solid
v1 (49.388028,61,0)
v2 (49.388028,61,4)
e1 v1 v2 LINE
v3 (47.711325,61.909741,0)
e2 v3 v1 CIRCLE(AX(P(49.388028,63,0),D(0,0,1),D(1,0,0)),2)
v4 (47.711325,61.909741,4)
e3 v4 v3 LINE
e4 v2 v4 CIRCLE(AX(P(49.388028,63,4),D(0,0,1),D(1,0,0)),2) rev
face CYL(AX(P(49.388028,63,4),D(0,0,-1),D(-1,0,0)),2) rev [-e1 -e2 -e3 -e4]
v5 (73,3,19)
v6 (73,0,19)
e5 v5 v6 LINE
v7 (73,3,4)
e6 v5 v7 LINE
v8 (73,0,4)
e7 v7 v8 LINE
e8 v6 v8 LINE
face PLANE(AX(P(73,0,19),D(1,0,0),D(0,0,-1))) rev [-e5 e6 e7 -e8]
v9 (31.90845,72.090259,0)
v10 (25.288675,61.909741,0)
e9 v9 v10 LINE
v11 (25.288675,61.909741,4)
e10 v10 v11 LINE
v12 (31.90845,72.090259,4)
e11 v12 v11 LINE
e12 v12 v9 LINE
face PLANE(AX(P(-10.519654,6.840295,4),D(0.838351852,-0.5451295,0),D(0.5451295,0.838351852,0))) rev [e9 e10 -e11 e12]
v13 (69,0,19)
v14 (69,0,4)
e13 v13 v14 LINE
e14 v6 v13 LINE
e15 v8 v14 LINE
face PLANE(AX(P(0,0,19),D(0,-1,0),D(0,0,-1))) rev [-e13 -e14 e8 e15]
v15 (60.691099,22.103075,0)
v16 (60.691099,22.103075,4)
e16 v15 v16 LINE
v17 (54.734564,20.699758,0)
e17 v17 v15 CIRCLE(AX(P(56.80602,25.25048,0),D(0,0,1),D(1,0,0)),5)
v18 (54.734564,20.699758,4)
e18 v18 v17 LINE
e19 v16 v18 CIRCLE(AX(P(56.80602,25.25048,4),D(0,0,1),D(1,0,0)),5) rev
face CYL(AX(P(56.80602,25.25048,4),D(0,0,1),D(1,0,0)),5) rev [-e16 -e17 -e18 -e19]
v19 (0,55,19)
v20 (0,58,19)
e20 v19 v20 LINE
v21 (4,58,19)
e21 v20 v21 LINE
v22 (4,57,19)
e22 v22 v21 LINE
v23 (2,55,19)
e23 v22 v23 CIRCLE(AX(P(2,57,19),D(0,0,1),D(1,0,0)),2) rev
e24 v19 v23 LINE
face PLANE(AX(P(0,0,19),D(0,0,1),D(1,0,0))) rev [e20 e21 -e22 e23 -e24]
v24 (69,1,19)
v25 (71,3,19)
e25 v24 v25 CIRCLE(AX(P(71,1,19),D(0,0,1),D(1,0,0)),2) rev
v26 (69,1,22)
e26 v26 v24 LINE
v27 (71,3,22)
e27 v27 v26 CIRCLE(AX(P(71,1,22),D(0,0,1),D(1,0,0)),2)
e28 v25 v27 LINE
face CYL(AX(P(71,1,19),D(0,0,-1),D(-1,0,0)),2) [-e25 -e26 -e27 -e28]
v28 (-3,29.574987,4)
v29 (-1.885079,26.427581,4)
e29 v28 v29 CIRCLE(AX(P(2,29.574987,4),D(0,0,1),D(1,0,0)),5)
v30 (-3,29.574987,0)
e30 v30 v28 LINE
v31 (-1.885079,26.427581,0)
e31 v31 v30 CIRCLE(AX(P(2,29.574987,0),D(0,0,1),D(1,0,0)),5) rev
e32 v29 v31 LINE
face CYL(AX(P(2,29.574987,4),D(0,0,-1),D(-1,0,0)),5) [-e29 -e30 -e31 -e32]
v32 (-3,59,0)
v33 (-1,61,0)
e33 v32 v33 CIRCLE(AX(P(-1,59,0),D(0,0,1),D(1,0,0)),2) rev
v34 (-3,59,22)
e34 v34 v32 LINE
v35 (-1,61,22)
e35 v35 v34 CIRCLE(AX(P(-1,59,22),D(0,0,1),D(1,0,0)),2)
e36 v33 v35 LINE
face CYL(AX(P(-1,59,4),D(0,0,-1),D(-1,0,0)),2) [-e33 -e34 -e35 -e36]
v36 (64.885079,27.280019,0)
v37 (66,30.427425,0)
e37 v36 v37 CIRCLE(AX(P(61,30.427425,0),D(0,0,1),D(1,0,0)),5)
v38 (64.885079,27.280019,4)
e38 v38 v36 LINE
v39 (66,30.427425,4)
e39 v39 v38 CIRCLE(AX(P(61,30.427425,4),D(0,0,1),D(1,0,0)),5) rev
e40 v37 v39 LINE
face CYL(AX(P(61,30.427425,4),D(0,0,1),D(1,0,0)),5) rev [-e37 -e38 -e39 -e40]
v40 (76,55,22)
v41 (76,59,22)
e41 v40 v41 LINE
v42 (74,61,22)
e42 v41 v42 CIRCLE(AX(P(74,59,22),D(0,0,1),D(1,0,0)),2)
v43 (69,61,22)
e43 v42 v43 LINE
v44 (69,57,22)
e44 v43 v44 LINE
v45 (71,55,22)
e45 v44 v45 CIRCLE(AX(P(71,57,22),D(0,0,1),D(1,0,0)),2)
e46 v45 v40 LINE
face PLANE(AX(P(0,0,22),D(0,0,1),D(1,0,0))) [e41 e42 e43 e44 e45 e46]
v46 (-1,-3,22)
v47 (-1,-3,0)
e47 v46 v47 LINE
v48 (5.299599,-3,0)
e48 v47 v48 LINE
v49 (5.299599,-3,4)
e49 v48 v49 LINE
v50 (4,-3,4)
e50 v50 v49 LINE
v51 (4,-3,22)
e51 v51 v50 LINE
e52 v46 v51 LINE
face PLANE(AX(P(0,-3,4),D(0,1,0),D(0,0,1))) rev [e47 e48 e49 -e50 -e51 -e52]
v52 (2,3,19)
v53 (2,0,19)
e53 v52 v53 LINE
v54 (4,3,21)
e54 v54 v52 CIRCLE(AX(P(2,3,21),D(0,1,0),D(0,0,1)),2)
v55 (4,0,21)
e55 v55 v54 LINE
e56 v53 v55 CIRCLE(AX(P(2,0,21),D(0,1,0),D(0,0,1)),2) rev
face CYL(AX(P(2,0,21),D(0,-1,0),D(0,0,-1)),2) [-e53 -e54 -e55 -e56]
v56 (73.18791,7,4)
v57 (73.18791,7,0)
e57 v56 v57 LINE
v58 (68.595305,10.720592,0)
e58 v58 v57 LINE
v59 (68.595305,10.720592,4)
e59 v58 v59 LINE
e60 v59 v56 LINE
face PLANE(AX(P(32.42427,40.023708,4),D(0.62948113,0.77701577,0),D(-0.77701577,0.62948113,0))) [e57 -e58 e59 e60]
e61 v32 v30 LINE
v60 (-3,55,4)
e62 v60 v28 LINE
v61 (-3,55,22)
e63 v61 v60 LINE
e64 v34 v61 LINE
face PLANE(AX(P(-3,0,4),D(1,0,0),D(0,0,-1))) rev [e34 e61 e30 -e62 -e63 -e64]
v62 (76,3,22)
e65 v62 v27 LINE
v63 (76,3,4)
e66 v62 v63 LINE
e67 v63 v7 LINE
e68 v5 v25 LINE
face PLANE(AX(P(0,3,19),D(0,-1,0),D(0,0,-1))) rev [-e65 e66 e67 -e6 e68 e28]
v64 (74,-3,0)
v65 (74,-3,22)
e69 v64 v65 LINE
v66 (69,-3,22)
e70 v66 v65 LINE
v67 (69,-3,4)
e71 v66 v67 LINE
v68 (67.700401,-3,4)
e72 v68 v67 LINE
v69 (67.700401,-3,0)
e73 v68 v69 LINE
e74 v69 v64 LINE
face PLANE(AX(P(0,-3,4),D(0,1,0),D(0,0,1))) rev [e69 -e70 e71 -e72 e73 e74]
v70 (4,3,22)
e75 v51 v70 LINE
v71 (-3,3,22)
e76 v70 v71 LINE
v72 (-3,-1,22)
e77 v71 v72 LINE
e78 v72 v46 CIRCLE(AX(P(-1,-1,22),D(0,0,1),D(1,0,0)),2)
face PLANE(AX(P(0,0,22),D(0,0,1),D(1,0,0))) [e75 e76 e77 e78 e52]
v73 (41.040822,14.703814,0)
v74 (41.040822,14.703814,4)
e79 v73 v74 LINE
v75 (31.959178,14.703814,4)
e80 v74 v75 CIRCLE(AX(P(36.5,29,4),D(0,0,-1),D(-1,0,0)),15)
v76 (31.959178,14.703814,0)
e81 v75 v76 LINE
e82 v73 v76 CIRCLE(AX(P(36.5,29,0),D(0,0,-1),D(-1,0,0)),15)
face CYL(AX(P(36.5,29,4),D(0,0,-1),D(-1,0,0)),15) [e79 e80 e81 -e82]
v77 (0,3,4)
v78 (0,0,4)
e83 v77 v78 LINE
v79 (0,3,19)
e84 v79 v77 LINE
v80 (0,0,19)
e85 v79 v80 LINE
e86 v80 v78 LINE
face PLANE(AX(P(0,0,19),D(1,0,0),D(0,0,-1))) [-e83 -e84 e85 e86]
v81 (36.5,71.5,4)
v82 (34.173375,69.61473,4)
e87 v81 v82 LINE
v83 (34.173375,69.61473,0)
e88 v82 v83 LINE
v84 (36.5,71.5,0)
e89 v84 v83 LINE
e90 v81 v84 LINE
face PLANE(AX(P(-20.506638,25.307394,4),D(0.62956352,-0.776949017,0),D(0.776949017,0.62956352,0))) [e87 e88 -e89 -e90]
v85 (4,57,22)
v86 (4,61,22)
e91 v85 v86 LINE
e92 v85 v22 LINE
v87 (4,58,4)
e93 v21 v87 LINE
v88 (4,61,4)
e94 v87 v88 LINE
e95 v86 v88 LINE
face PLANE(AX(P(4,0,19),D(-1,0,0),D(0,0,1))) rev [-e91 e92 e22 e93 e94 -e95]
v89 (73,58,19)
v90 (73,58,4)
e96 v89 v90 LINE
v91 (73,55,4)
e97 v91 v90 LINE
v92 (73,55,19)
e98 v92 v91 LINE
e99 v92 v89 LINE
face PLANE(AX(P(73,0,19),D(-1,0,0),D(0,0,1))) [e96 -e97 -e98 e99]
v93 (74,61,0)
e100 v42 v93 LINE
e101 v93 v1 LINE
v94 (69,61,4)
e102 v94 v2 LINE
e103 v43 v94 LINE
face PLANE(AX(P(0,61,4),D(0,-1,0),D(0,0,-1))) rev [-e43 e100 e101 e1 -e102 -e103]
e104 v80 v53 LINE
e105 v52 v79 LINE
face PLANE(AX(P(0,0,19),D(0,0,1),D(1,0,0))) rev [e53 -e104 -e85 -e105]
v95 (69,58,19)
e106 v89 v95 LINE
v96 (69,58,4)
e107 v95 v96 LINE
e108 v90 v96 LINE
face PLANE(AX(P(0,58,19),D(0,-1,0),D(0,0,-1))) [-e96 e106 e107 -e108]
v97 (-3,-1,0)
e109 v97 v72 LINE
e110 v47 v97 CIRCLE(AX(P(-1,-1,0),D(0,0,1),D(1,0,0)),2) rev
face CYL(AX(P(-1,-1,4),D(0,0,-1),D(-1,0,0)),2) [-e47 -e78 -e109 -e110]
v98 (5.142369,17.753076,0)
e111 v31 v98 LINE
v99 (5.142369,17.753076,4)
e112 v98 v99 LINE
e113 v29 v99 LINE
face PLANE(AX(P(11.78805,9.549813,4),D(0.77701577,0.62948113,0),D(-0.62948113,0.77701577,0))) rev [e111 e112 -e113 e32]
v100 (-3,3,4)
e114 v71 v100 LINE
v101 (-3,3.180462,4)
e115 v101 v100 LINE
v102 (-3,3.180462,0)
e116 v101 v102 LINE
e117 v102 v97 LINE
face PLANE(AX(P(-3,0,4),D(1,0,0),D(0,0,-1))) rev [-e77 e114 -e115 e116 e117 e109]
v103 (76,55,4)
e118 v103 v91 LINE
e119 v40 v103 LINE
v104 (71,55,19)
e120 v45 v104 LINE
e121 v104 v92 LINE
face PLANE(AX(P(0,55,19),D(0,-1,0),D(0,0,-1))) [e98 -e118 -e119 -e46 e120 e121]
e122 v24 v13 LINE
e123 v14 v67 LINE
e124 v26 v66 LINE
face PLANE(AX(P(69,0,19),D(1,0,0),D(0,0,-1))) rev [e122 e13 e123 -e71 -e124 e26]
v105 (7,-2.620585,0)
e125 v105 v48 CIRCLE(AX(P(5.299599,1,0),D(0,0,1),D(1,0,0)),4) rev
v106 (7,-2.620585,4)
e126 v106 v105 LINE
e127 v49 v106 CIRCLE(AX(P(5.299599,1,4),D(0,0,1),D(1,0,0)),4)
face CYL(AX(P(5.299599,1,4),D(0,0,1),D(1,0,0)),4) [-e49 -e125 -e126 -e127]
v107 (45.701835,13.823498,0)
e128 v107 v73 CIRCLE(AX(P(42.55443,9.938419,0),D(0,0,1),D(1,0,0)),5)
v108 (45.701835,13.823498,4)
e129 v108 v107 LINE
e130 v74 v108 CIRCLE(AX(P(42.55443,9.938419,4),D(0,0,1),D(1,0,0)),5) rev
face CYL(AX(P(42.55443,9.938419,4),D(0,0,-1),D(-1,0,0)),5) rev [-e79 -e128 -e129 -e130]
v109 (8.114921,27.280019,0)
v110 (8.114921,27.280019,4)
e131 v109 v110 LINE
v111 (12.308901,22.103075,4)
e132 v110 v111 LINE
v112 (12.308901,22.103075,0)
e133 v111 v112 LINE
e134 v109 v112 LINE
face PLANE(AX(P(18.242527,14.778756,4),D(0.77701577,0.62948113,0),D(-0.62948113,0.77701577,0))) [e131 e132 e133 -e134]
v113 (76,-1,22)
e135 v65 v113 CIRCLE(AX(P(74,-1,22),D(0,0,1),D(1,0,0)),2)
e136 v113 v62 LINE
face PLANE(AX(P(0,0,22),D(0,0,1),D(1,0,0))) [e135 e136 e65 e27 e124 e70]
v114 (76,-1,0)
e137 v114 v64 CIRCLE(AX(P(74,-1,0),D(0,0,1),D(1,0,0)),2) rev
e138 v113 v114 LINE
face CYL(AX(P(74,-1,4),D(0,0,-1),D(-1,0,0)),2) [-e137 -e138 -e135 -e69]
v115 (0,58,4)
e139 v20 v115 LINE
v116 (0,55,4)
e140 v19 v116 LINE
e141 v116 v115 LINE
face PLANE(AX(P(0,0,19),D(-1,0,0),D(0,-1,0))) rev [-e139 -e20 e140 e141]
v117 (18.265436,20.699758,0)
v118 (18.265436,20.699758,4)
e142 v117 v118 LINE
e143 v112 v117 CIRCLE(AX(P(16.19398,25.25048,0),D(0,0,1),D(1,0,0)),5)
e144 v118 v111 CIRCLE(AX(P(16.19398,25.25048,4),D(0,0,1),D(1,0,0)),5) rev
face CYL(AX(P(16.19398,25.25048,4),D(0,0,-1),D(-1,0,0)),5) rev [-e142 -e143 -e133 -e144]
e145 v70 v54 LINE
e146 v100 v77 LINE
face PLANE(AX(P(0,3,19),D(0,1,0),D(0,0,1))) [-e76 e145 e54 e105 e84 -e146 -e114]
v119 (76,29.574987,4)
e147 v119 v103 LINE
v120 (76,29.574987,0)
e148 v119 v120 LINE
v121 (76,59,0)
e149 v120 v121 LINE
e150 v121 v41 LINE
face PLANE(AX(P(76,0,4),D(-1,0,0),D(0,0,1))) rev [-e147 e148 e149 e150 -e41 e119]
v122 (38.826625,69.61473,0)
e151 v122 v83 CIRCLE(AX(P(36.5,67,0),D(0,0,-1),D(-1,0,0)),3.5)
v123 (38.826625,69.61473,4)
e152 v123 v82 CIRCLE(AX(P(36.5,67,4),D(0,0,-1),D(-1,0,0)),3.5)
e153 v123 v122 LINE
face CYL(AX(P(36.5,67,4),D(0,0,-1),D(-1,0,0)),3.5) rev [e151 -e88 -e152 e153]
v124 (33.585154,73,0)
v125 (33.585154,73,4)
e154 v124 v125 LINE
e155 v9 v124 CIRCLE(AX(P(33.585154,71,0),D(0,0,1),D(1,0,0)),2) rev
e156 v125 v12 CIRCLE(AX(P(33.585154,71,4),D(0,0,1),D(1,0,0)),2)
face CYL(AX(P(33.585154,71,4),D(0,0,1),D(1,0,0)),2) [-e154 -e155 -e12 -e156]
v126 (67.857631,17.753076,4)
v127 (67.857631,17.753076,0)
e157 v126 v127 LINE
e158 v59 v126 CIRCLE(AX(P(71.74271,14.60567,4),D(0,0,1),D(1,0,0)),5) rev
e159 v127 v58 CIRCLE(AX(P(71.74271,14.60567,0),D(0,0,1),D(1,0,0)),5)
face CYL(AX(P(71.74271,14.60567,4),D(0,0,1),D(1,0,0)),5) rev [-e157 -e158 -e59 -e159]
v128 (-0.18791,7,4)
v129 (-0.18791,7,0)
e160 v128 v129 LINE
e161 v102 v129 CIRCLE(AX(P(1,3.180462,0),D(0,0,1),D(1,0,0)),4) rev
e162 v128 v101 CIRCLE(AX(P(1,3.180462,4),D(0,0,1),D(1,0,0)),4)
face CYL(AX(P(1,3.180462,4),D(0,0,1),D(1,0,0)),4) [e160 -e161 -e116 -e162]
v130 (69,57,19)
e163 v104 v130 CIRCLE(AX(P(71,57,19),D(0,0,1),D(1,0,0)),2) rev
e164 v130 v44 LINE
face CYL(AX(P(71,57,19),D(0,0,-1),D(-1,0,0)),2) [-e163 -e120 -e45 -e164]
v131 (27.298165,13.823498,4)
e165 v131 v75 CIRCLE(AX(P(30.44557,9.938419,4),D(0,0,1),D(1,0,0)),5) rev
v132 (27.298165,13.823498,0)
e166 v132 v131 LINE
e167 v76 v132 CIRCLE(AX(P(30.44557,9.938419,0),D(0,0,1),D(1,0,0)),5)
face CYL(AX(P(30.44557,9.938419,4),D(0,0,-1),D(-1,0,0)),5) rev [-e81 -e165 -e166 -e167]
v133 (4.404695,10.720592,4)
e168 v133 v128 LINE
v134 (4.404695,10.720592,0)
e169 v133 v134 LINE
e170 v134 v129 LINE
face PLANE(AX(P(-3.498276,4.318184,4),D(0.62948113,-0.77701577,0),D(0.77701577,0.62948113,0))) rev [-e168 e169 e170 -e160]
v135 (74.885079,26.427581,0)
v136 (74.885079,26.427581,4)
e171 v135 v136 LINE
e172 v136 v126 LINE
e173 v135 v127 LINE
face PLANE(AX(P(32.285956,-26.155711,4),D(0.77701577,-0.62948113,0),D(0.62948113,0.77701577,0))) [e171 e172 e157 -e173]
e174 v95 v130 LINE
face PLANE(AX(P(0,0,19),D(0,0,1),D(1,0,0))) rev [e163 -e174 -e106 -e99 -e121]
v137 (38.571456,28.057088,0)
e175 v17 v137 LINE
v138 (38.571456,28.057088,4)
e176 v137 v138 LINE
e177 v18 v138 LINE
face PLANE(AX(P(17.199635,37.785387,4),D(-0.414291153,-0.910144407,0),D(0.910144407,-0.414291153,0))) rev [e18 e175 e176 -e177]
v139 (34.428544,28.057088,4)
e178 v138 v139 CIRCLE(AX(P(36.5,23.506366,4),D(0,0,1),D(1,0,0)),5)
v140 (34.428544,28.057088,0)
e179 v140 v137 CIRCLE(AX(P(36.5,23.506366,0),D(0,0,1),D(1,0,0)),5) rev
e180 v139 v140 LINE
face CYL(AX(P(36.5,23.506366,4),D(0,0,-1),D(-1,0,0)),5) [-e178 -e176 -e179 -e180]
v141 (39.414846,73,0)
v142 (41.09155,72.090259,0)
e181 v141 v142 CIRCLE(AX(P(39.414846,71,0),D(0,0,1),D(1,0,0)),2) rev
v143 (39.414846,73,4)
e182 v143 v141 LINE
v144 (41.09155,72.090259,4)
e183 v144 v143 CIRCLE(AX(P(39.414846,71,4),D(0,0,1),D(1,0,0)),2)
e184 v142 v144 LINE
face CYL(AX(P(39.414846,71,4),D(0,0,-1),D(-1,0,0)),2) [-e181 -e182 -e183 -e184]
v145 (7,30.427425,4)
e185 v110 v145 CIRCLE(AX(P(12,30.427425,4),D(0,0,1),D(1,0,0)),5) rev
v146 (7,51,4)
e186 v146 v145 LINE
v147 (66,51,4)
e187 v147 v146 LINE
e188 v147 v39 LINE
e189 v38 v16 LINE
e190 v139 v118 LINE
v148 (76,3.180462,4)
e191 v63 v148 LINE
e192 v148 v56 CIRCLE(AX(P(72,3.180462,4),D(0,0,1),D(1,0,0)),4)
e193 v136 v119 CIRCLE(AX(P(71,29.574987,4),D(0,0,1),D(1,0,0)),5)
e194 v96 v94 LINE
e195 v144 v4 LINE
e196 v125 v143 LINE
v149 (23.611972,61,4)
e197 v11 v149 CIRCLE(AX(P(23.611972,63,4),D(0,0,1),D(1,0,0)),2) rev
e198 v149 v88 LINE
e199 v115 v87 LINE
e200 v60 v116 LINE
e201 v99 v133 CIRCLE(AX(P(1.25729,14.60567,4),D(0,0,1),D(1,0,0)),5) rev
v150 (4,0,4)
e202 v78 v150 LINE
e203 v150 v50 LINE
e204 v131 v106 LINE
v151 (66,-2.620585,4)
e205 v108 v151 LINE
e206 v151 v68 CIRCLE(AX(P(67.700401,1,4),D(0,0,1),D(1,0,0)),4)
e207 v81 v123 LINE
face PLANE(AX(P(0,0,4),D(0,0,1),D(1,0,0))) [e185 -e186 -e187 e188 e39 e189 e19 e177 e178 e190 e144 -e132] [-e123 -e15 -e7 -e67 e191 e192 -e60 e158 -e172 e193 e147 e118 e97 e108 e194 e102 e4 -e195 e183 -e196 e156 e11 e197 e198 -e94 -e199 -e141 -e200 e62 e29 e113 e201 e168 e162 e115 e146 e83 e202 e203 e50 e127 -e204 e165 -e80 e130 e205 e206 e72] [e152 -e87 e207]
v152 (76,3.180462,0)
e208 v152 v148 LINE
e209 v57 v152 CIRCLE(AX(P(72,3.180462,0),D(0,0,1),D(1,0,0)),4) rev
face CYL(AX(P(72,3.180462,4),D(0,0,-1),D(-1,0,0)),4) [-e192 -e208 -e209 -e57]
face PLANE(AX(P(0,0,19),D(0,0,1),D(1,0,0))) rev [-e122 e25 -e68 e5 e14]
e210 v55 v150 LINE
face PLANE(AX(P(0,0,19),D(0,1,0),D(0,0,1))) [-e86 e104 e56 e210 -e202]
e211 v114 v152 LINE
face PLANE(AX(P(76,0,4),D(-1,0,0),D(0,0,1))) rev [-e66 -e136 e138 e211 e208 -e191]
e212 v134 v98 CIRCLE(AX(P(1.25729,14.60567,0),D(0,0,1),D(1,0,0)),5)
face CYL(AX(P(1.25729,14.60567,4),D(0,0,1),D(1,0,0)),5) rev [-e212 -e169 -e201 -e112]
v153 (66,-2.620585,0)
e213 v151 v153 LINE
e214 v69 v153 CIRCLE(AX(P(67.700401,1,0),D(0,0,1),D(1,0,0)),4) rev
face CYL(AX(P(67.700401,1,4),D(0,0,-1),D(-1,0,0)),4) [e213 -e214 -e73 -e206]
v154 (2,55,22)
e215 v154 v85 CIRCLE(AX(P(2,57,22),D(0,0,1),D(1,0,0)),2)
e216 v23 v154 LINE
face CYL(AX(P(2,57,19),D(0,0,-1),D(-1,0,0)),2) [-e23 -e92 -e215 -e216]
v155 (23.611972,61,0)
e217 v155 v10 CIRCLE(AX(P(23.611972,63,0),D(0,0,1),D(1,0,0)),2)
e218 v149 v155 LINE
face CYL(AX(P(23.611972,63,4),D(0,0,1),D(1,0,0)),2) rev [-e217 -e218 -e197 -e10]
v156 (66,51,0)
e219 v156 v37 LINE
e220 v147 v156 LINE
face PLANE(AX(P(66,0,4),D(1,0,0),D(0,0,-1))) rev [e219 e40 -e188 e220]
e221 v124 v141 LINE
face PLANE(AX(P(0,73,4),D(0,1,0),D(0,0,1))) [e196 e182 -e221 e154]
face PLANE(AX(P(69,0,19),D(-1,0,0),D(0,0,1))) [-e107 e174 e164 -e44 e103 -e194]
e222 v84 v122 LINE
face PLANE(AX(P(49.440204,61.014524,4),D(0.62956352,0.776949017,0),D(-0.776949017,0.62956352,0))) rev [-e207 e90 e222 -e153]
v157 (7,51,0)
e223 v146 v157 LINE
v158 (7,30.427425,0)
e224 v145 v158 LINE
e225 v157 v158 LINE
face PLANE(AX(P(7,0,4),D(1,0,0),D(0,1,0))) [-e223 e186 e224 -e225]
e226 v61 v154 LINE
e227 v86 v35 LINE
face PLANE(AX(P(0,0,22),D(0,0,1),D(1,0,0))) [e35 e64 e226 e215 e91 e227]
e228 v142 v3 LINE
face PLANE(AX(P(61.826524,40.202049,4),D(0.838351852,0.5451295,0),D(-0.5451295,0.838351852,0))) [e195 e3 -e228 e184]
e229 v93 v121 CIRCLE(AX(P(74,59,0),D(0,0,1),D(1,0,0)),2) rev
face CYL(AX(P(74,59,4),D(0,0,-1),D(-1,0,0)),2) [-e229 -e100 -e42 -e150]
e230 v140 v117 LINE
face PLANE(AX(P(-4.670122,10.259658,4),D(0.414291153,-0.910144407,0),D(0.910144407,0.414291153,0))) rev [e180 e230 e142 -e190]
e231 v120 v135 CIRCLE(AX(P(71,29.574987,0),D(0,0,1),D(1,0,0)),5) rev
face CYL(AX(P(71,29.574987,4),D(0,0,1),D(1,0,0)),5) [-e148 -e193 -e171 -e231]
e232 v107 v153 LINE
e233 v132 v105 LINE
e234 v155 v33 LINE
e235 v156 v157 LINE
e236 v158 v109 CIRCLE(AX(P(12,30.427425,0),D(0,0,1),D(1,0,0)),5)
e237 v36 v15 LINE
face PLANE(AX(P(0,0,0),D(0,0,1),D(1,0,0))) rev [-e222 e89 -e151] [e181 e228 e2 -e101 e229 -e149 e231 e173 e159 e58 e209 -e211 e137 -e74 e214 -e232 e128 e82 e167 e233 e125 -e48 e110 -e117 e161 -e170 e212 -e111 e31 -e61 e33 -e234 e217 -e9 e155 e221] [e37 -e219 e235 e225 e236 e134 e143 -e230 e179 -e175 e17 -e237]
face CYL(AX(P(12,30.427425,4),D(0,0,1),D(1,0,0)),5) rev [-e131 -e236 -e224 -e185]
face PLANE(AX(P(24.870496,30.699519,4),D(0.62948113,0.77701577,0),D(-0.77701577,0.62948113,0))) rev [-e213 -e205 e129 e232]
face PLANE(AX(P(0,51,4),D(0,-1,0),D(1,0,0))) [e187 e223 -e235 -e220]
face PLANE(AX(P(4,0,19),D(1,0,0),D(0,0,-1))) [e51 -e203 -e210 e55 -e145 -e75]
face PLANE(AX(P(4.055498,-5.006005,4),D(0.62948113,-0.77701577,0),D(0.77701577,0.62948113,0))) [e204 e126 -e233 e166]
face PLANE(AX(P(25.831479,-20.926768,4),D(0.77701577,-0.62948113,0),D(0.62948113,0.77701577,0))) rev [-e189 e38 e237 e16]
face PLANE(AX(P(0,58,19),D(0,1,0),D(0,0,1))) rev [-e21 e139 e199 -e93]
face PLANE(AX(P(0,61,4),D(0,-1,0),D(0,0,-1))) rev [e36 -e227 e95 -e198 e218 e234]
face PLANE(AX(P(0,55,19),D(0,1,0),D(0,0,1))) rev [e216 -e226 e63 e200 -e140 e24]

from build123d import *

# Parameters (mm, degrees)
SKETCH1_W           = 79
SKETCH1_H           = 64
BOSS_EXTRUDE1_DEPTH = 4
BOSS_EXTRUDE2_DEPTH = 15
SKETCH3_W           = 7
SKETCH3_H           = 6
BOSS_EXTRUDE3_DEPTH = 3
CUT_EXTRUDE1_DEPTH  = 4
BOSS_EXTRUDE4_DEPTH = 4
FILLET1_R           = 2
FILLET2_R           = 5
FILLET3_R           = 4


with BuildPart() as part:
    # Sketch1 → Boss-Extrude1 (new body)
    with BuildSketch(Plane.XY):
        with Locations((36.5, 29)):
            Rectangle(SKETCH1_W, SKETCH1_H)
    extrude(amount=BOSS_EXTRUDE1_DEPTH)

    # Sketch2 → Boss-Extrude2 (add)
    with BuildSketch(Plane.XY.offset(4)):
        Polygon((76, -3), (76, 3), (73, 3), (73, 0), (69, 0), (69, -3), align=None)
        Polygon((0, 3), (-3, 3), (-3, -3), (4, -3), (4, 0), (0, 0), align=None)
        Polygon((0, 58), (4, 58), (4, 61), (-3, 61), (-3, 55), (0, 55), align=None)
        Polygon((76, 61), (69, 61), (69, 58), (73, 58), (73, 55), (76, 55), align=None)
    extrude(amount=BOSS_EXTRUDE2_DEPTH)

    # Sketch3 → Boss-Extrude3 (add)
    with BuildSketch(Plane.XY.offset(19)):
        with Locations((0.5, 58)):
            Rectangle(SKETCH3_W, SKETCH3_H)
        with Locations((0.5, 0)):
            Rectangle(SKETCH3_W, SKETCH3_H)
        with Locations((72.5, 0)):
            Rectangle(SKETCH3_W, SKETCH3_H)
        with Locations((72.5, 58)):
            Rectangle(SKETCH3_W, SKETCH3_H)
    extrude(amount=BOSS_EXTRUDE3_DEPTH)

    # Sketch4 → Cut-Extrude1 (cut)
    with BuildSketch(Plane(origin=(0, 0, 0), x_dir=(-1, 0, 0), z_dir=(0, 0, -1))):
        Polygon((3, 27.803812192), (-8.289774189, 13.867997178), (0.187909827, 7), (3, 7), align=None)
        Polygon((-73.187909827, 7), (-64.710225811, 13.867997178), (-76, 27.803812192), (-76, 7), align=None)
        Polygon((-7, 51), (-66, 51), (-66, 28.65625), (-58.25574912, 19.09694032), (-36.5, 29), (-14.74425088, 19.09694032), (-7, 28.65625), align=None)
        with BuildLine():
            Line((-66, -2.620585177), (-66, -3))
            Line((-66, -3), (-7, -3))
            Line((-7, -3), (-7, -2.620585177))
            Line((-7, -2.620585177), (-29.594686034, 15.683970598))
            ThreePointArc((-29.594686034, 15.683970598), (-36.5, 14), (-43.405313966, 15.683970598))
            Line((-43.405313966, 15.683970598), (-66, -2.620585177))
        make_face()
    extrude(amount=-CUT_EXTRUDE1_DEPTH, mode=Mode.SUBTRACT)

    # Sketch5 → Boss-Extrude4 (add)
    with BuildSketch(Plane(origin=(0, 0, 0), x_dir=(-1, 0, 0), z_dir=(0, 0, -1))):
        Polygon((-24.697125845, 61), (-32.5, 73), (-40.5, 73), (-48.302874155, 61), align=None)
        with BuildLine():
            Line((-38.826625292, 69.61473034), (-36.5, 71.5))
            Line((-36.5, 71.5), (-34.173374708, 69.61473034))
            ThreePointArc((-34.173374708, 69.61473034), (-36.5, 63.5), (-38.826625292, 69.61473034))
        make_face(mode=Mode.SUBTRACT)
    extrude(amount=-BOSS_EXTRUDE4_DEPTH)

    # Fillet1
    fillet1_edges = [part.edges().sort_by_distance(p)[0] for p in [
        (4, 1.5, 19),
        (69, 3, 20.5),
        (69, 55, 20.5),
        (32.5, 73, 2),
        (24.697125845, 61, 2),
        (48.302874155, 61, 2),
        (40.5, 73, 2),
        (76, 61, 11),
        (76, -3, 11),
        (-3, -3, 11),
        (-3, 61, 11),
        (4, 55, 20.5),
    ]]
    fillet(fillet1_edges, radius=FILLET1_R)

    # Fillet2
    fillet2_edges = [part.edges().sort_by_distance(p)[0] for p in [
        (76, 27.803812192, 2),
        (64.710225811, 13.867997178, 2),
        (-3, 27.803812192, 2),
        (8.289774189, 13.867997178, 2),
        (7, 28.65625, 2),
        (14.74425088, 19.09694032, 2),
        (36.5, 29, 2),
        (58.25574912, 19.09694032, 2),
        (66, 28.65625, 2),
        (43.405313966, 15.683970598, 2),
        (29.594686034, 15.683970598, 2),
    ]]
    fillet(fillet2_edges, radius=FILLET2_R)

    # Fillet3
    # the kernel refuses this fillet: 4 mm, written as the material it takes off along each edge
    with BuildSketch(Plane(origin=(76, 7, -9.548844905), x_dir=(-1, 0, 0), z_dir=(0, 0, 1))) as fillet3_piece_1:
        with BuildLine():
            CenterArc((4, 3.819537962), FILLET3_R, 180, 72.723847708)
            Line((0, 3.819537962), (-0.08, 3.819537962))
            Line((-0.08, 3.819537962), (-0.08, 0))
            Line((-0.08, 0), (0, -0.08))
            ThreePointArc((0, -0.08), (1.406045086, -0.08), (2.788331976, -0.076390759))
            Line((2.788331976, -0.076390759), (2.812090173, 0))
        make_face()
    extrude(amount=23.097689809, mode=Mode.SUBTRACT)
    with BuildSketch(Plane(origin=(-3, 7, -9.548844905), x_dir=(1, 0, 0), z_dir=(0, 0, 1))) as fillet3_piece_2:
        with BuildLine():
            CenterArc((4, -3.819537962), FILLET3_R, 107.276152292, 72.723847708)
            Line((0, -3.819537962), (-0.08, -3.819537962))
            Line((-0.08, -3.819537962), (-0.08, 0))
            Line((-0.08, 0), (0, 0.08))
            ThreePointArc((0, 0.08), (1.406045086, 0.08), (2.788331976, 0.076390759))
            Line((2.788331976, 0.076390759), (2.812090173, 0))
        make_face()
    extrude(amount=23.097689809, mode=Mode.SUBTRACT)
    with BuildSketch(Plane(origin=(7, -3, -4.251002073), x_dir=(0, 1, 0), z_dir=(0, 0, 1))) as fillet3_piece_3:
        with BuildLine():
            CenterArc((4, 1.700400829), FILLET3_R, 180, 25.15700637)
            Line((0, 1.700400829), (-0.08, 1.700400829))
            Line((-0.08, 1.700400829), (-0.08, 0))
            Line((-0.08, 0), (0, -0.08))
            ThreePointArc((0, -0.08), (0.189707412, -0.08), (0.30700312, -0.034008017))
            Line((0.30700312, -0.034008017), (0.379414823, 0))
        make_face()
    extrude(amount=12.502004146, mode=Mode.SUBTRACT)
    with BuildSketch(Plane(origin=(66, -3, -4.251002073), x_dir=(1, 0, 0), z_dir=(0, 0, 1))) as fillet3_piece_4:
        with BuildLine():
            CenterArc((1.700400829, 4), FILLET3_R, 244.84299363, 25.15700637)
            Line((0, 0.379414823), (-0.034008017, 0.30700312))
            ThreePointArc((-0.034008017, 0.30700312), (-0.08, 0.189707412), (-0.08, 0))
            Line((-0.08, 0), (0, -0.08))
            Line((0, -0.08), (1.700400829, -0.08))
            Line((1.700400829, -0.08), (1.700400829, 0))
        make_face()
    extrude(amount=12.502004146, mode=Mode.SUBTRACT)


solid = part.part
